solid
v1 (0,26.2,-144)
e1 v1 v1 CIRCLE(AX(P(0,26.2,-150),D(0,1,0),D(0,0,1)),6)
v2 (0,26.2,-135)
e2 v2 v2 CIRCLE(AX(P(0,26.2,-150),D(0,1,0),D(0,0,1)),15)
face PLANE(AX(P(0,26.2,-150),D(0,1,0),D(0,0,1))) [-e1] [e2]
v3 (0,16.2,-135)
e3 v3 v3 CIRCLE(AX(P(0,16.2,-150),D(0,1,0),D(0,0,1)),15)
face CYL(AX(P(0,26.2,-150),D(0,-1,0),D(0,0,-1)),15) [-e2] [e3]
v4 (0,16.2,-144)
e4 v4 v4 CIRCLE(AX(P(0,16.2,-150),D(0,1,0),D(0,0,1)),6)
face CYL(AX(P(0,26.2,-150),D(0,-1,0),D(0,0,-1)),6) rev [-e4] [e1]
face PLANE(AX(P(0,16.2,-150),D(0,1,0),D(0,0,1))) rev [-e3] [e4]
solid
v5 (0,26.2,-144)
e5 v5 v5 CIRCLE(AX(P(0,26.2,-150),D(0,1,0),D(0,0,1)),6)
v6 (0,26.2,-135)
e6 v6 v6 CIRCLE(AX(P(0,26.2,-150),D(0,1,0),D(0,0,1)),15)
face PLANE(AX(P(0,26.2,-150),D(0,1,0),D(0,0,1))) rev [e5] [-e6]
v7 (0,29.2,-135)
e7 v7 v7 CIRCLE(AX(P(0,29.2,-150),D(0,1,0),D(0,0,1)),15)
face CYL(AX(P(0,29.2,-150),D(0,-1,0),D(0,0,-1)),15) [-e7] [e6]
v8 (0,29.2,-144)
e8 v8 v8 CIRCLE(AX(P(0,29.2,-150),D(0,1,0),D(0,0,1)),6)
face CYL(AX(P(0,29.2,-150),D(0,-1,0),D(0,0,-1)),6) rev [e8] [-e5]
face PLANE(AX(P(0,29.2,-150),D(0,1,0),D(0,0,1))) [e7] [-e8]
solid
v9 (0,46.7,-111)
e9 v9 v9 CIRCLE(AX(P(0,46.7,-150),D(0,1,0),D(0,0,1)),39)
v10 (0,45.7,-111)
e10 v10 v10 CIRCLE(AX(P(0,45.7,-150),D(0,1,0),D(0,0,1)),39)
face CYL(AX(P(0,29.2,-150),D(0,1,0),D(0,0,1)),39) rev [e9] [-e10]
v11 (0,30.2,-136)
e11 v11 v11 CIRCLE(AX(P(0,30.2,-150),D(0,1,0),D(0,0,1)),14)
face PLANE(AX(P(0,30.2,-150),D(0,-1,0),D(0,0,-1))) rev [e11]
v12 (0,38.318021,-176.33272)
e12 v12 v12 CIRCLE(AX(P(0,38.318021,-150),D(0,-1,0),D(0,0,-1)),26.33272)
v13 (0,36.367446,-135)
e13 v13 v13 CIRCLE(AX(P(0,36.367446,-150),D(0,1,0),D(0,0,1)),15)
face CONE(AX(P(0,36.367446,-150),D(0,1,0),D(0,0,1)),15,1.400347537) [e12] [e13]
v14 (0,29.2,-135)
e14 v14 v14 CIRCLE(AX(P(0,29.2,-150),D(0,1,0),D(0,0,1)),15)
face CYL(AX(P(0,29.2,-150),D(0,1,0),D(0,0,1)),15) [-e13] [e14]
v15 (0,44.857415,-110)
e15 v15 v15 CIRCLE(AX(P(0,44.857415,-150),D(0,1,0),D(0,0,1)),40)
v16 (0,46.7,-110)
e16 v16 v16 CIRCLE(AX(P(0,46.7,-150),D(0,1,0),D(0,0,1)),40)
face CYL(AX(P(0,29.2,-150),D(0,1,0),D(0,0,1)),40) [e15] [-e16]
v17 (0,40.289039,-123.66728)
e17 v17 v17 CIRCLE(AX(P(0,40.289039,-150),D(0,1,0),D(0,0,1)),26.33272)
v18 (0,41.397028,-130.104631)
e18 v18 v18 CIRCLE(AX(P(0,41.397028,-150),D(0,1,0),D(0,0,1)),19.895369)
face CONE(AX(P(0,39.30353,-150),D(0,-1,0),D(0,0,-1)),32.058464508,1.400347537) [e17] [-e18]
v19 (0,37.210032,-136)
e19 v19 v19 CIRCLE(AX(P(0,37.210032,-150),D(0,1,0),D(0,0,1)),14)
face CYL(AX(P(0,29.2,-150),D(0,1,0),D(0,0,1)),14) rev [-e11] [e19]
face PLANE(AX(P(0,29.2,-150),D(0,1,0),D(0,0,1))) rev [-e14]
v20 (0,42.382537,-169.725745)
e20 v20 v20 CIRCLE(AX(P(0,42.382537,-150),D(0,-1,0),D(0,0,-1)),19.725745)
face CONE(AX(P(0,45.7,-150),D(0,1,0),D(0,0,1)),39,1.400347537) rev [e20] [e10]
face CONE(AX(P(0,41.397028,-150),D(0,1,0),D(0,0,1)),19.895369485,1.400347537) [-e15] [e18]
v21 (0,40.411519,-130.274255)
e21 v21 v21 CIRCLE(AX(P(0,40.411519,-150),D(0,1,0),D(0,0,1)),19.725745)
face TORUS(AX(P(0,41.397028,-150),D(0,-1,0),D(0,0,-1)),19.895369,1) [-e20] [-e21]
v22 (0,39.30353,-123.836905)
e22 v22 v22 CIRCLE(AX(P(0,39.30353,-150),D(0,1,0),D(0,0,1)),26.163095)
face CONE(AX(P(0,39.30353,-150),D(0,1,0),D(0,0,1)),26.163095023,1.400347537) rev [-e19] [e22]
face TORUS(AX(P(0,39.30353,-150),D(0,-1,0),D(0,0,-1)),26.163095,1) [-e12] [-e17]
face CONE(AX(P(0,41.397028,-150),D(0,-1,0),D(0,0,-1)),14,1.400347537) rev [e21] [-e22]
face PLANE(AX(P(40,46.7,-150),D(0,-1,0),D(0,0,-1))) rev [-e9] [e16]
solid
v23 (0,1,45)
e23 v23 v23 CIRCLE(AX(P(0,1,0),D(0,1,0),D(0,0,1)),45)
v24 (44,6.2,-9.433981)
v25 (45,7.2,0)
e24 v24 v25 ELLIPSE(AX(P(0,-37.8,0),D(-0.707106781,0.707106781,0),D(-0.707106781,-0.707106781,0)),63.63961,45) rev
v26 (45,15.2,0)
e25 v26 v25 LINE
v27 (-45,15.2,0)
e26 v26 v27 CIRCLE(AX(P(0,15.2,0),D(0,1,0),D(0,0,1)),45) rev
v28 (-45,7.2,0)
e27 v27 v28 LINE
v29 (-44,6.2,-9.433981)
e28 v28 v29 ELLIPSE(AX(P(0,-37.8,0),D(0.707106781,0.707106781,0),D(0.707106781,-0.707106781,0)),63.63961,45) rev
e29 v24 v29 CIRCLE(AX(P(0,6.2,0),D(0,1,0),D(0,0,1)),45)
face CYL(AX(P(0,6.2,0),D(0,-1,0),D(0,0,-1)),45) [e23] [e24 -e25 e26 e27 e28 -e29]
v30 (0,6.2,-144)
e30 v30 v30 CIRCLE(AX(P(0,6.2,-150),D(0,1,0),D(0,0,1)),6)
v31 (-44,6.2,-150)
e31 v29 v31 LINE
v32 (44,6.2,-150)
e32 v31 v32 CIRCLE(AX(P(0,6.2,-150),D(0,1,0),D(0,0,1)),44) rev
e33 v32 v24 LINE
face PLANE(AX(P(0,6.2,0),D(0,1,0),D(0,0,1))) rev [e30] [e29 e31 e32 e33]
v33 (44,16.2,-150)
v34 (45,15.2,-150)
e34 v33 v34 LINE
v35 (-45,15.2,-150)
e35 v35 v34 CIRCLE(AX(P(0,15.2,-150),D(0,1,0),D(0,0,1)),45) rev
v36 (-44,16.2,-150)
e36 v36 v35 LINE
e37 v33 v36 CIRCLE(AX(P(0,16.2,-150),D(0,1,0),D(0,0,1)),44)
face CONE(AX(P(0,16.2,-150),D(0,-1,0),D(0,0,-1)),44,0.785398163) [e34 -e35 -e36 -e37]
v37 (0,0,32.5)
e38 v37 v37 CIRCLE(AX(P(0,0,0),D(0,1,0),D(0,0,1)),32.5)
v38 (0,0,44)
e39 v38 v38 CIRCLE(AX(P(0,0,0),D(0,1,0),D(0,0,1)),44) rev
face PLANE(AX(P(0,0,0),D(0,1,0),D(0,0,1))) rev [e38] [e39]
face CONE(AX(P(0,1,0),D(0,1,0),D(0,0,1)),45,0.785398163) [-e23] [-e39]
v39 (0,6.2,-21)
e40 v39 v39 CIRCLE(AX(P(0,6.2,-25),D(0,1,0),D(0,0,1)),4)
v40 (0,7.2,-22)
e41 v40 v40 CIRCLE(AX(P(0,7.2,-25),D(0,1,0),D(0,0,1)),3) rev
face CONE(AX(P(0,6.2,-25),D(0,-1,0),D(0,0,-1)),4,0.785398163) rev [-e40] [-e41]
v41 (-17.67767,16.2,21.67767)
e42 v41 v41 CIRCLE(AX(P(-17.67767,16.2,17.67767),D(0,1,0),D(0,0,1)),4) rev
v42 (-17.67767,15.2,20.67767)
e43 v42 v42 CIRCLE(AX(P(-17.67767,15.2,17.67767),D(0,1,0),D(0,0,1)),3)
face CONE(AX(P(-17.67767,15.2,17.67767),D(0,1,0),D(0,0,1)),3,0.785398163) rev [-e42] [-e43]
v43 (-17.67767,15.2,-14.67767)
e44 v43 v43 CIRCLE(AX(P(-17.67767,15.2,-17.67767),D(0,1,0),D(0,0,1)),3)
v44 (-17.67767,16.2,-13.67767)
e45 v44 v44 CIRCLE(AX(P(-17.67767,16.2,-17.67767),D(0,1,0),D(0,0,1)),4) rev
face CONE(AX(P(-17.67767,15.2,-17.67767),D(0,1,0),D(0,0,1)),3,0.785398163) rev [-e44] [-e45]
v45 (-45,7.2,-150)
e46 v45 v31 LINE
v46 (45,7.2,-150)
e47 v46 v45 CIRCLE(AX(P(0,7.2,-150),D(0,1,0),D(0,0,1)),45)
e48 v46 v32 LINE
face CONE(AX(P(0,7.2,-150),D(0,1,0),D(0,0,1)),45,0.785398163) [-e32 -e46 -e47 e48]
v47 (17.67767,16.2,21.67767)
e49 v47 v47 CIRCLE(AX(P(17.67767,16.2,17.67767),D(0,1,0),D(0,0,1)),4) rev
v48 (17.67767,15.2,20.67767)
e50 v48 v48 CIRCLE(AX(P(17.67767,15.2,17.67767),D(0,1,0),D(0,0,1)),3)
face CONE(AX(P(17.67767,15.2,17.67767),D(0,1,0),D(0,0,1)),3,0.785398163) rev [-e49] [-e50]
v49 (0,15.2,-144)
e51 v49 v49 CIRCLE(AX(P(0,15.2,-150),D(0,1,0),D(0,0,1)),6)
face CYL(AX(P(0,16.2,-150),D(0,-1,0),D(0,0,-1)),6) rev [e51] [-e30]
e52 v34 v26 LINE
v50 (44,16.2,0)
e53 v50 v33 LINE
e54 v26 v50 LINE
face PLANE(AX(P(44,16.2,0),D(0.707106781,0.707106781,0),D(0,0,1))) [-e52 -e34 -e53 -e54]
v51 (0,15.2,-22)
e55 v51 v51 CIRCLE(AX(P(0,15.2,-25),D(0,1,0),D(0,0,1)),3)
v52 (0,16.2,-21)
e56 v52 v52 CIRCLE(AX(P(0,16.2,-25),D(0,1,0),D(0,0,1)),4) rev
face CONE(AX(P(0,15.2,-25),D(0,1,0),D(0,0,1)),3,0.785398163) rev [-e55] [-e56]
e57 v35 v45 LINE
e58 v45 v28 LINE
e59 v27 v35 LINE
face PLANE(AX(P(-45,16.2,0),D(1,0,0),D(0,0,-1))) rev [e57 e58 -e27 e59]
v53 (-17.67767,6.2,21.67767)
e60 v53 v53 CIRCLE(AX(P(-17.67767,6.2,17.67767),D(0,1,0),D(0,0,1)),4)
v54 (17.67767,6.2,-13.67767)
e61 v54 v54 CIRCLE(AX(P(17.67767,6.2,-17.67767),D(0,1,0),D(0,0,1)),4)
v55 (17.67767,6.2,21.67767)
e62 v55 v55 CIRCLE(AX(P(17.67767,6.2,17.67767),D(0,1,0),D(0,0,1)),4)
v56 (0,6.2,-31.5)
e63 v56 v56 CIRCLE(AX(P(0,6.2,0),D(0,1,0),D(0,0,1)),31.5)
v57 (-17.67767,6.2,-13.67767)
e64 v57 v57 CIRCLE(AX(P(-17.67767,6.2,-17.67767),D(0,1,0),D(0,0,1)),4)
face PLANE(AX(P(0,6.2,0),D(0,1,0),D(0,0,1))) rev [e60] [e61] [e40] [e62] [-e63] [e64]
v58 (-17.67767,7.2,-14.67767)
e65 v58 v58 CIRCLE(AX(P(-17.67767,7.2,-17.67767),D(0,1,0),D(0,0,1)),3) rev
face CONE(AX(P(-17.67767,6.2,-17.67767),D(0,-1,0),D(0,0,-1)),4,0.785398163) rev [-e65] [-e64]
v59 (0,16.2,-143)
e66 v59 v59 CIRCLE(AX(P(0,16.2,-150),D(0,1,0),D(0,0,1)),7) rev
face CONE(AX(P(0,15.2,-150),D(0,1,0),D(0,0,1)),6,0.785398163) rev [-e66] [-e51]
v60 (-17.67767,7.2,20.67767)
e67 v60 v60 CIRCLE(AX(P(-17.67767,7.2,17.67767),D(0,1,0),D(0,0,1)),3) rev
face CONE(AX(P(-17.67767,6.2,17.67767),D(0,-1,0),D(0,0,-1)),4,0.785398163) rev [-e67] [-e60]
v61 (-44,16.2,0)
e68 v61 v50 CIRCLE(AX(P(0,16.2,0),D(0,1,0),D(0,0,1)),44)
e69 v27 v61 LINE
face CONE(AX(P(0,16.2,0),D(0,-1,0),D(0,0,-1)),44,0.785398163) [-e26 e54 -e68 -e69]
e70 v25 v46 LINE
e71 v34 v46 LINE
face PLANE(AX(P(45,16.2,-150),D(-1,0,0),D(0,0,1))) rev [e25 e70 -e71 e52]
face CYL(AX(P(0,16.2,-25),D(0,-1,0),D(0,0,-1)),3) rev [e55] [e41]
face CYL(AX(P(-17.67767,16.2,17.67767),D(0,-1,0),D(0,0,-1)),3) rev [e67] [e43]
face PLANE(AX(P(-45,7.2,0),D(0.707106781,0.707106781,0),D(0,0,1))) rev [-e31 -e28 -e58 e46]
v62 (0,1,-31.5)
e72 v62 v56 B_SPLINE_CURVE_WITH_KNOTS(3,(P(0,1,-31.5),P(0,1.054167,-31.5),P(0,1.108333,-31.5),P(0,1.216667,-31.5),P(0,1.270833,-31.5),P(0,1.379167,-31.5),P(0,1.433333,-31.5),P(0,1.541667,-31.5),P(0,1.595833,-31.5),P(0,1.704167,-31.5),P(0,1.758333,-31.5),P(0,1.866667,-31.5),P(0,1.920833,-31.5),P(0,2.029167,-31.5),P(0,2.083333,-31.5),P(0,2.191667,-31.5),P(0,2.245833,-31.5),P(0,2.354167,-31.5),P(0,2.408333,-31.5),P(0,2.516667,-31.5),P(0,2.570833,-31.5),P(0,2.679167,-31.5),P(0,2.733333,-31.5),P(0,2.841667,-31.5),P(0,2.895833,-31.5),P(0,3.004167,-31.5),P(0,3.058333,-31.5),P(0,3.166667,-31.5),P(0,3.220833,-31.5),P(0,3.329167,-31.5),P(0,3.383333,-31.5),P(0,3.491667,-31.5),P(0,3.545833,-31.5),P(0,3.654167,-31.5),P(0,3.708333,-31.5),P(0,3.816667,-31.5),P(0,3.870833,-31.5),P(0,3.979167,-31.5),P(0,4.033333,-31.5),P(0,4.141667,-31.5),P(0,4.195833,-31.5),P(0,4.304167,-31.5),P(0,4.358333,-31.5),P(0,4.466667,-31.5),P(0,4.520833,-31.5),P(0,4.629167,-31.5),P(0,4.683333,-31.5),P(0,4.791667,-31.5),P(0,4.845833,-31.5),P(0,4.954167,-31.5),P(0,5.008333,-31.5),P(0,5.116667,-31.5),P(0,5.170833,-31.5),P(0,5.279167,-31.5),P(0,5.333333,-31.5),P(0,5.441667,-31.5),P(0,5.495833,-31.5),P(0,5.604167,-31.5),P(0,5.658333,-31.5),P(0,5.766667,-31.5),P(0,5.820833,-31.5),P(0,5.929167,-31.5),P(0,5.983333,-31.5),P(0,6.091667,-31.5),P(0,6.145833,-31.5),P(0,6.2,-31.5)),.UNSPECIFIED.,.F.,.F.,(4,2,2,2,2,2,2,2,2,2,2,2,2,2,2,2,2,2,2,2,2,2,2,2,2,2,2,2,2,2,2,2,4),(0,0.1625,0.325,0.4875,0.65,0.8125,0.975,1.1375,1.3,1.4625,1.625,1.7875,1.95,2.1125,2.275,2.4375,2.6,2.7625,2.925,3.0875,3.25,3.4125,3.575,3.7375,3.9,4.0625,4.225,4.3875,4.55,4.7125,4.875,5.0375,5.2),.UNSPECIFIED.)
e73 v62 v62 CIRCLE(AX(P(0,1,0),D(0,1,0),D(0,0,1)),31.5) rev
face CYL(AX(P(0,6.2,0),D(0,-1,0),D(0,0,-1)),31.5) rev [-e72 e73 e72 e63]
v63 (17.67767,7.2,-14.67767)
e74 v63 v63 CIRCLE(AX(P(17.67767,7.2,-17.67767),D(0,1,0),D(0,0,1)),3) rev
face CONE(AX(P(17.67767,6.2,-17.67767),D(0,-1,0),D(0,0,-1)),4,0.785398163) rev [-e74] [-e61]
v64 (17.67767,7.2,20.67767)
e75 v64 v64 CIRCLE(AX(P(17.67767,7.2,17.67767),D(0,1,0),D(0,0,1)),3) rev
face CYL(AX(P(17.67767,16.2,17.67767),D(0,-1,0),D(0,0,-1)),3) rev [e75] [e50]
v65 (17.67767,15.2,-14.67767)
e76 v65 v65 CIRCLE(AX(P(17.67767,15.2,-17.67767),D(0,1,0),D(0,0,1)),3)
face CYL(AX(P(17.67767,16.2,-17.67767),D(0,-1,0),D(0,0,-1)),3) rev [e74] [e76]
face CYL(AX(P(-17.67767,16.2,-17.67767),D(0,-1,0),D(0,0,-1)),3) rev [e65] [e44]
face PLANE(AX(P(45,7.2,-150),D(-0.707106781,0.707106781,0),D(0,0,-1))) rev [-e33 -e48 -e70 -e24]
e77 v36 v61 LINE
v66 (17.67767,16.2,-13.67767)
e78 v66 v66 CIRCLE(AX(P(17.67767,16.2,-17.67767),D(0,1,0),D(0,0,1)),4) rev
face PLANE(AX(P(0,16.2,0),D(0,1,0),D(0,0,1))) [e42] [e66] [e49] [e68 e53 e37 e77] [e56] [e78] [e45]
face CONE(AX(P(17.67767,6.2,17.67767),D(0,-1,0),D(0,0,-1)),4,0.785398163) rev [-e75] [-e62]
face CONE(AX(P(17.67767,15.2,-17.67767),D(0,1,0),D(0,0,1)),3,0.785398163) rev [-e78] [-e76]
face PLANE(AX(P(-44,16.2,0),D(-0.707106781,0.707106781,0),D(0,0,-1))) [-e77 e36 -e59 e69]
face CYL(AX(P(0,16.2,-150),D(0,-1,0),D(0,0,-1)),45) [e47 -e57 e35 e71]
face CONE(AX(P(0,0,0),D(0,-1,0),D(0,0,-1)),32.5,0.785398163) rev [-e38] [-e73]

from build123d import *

# Parameters (mm, degrees)
SKIZZE2_R                       = 45
SKIZZE2_R_2                     = 31.5
AUFSATZ_LINEAR_AUSTRAGEN1_DEPTH = 6.2
SKIZZE3_R                       = 3
SKIZZE3_R_2                     = 6
AUFSATZ_LINEAR_AUSTRAGEN2_DEPTH = 10
SKIZZE4_R                       = 15
SKIZZE4_R_2                     = 6
AUFSATZ_LINEAR_AUSTRAGEN3_DEPTH = 10
SKIZZE5_R                       = 15
SKIZZE5_R_2                     = 6
AUFSATZ_LINEAR_AUSTRAGEN4_DEPTH = 3
VERRUNDUNG1_R                   = 1
FASE1_SIZE                      = 1


with BuildPart() as part:
    # Skizze2 → Aufsatz-Linear austragen1 (new body)
    with BuildSketch(Plane(origin=(0, 0, 0), x_dir=(1, 0, 0), z_dir=(0, 1, 0))):
        with Locations(Location((0, 0, 0), (0, 0, 90))):
            Circle(SKIZZE2_R)
        with Locations(Location((0, 0, 0), (0, 0, 90))):
            Circle(SKIZZE2_R_2, mode=Mode.SUBTRACT)
    extrude(amount=AUFSATZ_LINEAR_AUSTRAGEN1_DEPTH)

    # Skizze3 → Aufsatz-Linear austragen2 (add)
    with BuildSketch(Plane(origin=(0, 6.2, 0), x_dir=(1, 0, 0), z_dir=(0, 1, 0))):
        with BuildLine():
            Line((-45, 0), (-45, 150))
            ThreePointArc((-45, 150), (0, 195), (45, 150))
            Line((45, 150), (45, 0))
            ThreePointArc((45, 0), (0, -45), (-45, 0))
        make_face()
        with Locations(Location((0, 25, 0), (0, 0, 270))):
            Circle(SKIZZE3_R, mode=Mode.SUBTRACT)
        with Locations(Location((17.67766953, 17.67766953, 0), (0, 0, 270))):
            Circle(SKIZZE3_R, mode=Mode.SUBTRACT)
        with Locations(Location((17.67766953, -17.67766953, 0), (0, 0, 270))):
            Circle(SKIZZE3_R, mode=Mode.SUBTRACT)
        with Locations(Location((-17.67766953, -17.67766953, 0), (0, 0, 270))):
            Circle(SKIZZE3_R, mode=Mode.SUBTRACT)
        with Locations(Location((-17.67766953, 17.67766953, 0), (0, 0, 270))):
            Circle(SKIZZE3_R, mode=Mode.SUBTRACT)
        with Locations(Location((0, 150, 0), (0, 0, 270))):
            Circle(SKIZZE3_R_2, mode=Mode.SUBTRACT)
    extrude(amount=AUFSATZ_LINEAR_AUSTRAGEN2_DEPTH)

    # Fase1
    # the kernel refuses this chamfer: 1 mm, written as the material it takes off along each edge
    with BuildSketch(Plane(origin=(0, 16.2, 0), x_dir=(1, 0, 0), z_dir=(0, 0, -1))) as fase1_piece_1:
        Polygon((45, FASE1_SIZE), (45 - FASE1_SIZE, 0), (45, 0), align=None)
    revolve(axis=Axis((0, 16.2, 0), (0, -1, 0)), revolution_arc=180, mode=Mode.SUBTRACT)
    with BuildSketch(Plane(origin=(45, 16.2, -150), x_dir=(0.0274958766105891, -0.9996219169112968, 0), z_dir=(0, 0, 1)), Plane(origin=(-45, 16.2, 0), x_dir=(-0.0274958766105891, -0.9996219169112968, 0), z_dir=(0, 0, -1))) as fase1_piece_2:
        Polygon((FASE1_SIZE * 0.999621916911, -FASE1_SIZE * 0.0274958766106), (-FASE1_SIZE * 0.0274958766106, -FASE1_SIZE * 0.999621916911), (0, 0), align=None)
    extrude(amount=150, mode=Mode.SUBTRACT)
    with BuildSketch(Plane(origin=(0, 16.2, -150), x_dir=(-1, 0, 0), z_dir=(0, 0, 1))) as fase1_piece_3:
        Polygon((45, FASE1_SIZE), (45 - FASE1_SIZE, 0), (45, 0), align=None)
    revolve(axis=Axis((0, 16.2, -150), (0, -1, 0)), revolution_arc=180, mode=Mode.SUBTRACT)
    with BuildSketch(Plane(origin=(0, 6.2, -25), x_dir=(0, 0, 1), z_dir=(-1, 0, 0))) as fase1_piece_4:
        Polygon((3 + FASE1_SIZE, 0), (3, FASE1_SIZE), (3, 0), align=None)
    revolve(axis=Axis((0, 6.2, -25), (0, 1, 0)), mode=Mode.SUBTRACT)
    with BuildSketch(Plane(origin=(17.67766953, 6.2, -17.67766953), x_dir=(0, 0, 1), z_dir=(-1, 0, 0))) as fase1_piece_5:
        Polygon((3 + FASE1_SIZE, 0), (3, FASE1_SIZE), (3, 0), align=None)
    revolve(axis=Axis((17.67766953, 6.2, -17.67766953), (0, 1, 0)), mode=Mode.SUBTRACT)
    with BuildSketch(Plane(origin=(17.67766953, 6.2, 17.67766953), x_dir=(0, 0, 1), z_dir=(-1, 0, 0))) as fase1_piece_6:
        Polygon((3 + FASE1_SIZE, 0), (3, FASE1_SIZE), (3, 0), align=None)
    revolve(axis=Axis((17.67766953, 6.2, 17.67766953), (0, 1, 0)), mode=Mode.SUBTRACT)
    with BuildSketch(Plane(origin=(-17.67766953, 6.2, 17.67766953), x_dir=(0, 0, 1), z_dir=(-1, 0, 0))) as fase1_piece_7:
        Polygon((3 + FASE1_SIZE, 0), (3, FASE1_SIZE), (3, 0), align=None)
    revolve(axis=Axis((-17.67766953, 6.2, 17.67766953), (0, 1, 0)), mode=Mode.SUBTRACT)
    with BuildSketch(Plane(origin=(-17.67766953, 6.2, -17.67766953), x_dir=(0, 0, 1), z_dir=(-1, 0, 0))) as fase1_piece_8:
        Polygon((3 + FASE1_SIZE, 0), (3, FASE1_SIZE), (3, 0), align=None)
    revolve(axis=Axis((-17.67766953, 6.2, -17.67766953), (0, 1, 0)), mode=Mode.SUBTRACT)
    with BuildSketch(Plane(origin=(45, 6.2, -150), x_dir=(-0.9996219169112968, -0.027495876610586414, 0), z_dir=(0, 0, 1))) as fase1_piece_9_section:
        Polygon((FASE1_SIZE * 0.999621916911, -FASE1_SIZE * 0.0274958766106), (-FASE1_SIZE * 0.0274958766106, -FASE1_SIZE * 0.999621916911), (0, 0), align=None)
    fase1_piece_9 = extrude(amount=152.571682988, mode=Mode.PRIVATE)
    fase1_piece_9 = fase1_piece_9 - Plane(origin=(0, 6.532274543, 0), x_dir=(0, 0, -1), z_dir=(0, -1, 0)) * Cylinder(45, 310, mode=Mode.PRIVATE)
    add(fase1_piece_9, mode=Mode.SUBTRACT)
    with BuildSketch(Plane(origin=(0, 6.2, -150), x_dir=(-1, 0, 0), z_dir=(0, 0, 1))) as fase1_piece_10:
        Polygon((45 - FASE1_SIZE, 0), (45, -FASE1_SIZE), (45, 0), align=None)
    revolve(axis=Axis((0, 6.2, -150), (0, -1, 0)), revolution_arc=180, mode=Mode.SUBTRACT)
    with BuildSketch(Plane(origin=(-45, 6.2, 2.571682988), x_dir=(0.9996219169112968, -0.027495876610586414, 0), z_dir=(0, 0, -1))) as fase1_piece_11_section:
        Polygon((FASE1_SIZE * 0.999621916911, -FASE1_SIZE * 0.0274958766106), (-FASE1_SIZE * 0.0274958766106, -FASE1_SIZE * 0.999621916911), (0, 0), align=None)
    fase1_piece_11 = extrude(amount=152.571682988, mode=Mode.PRIVATE)
    fase1_piece_11 = fase1_piece_11 - Plane(origin=(0, 6.532274543, 0), x_dir=(0, 0, -1), z_dir=(0, -1, 0)) * Cylinder(45, 310, mode=Mode.PRIVATE)
    add(fase1_piece_11, mode=Mode.SUBTRACT)
    with BuildSketch(Plane(origin=(0, 16.2, -25), x_dir=(0, 0, 1), z_dir=(-1, 0, 0))) as fase1_piece_12:
        Polygon((3 + FASE1_SIZE, 0), (3, -FASE1_SIZE), (3, 0), align=None)
    revolve(axis=Axis((0, 16.2, -25), (0, 1, 0)), mode=Mode.SUBTRACT)
    with BuildSketch(Plane(origin=(17.67766953, 16.2, -17.67766953), x_dir=(0, 0, 1), z_dir=(-1, 0, 0))) as fase1_piece_13:
        Polygon((3 + FASE1_SIZE, 0), (3, -FASE1_SIZE), (3, 0), align=None)
    revolve(axis=Axis((17.67766953, 16.2, -17.67766953), (0, 1, 0)), mode=Mode.SUBTRACT)
    with BuildSketch(Plane(origin=(17.67766953, 16.2, 17.67766953), x_dir=(0, 0, 1), z_dir=(-1, 0, 0))) as fase1_piece_14:
        Polygon((3 + FASE1_SIZE, 0), (3, -FASE1_SIZE), (3, 0), align=None)
    revolve(axis=Axis((17.67766953, 16.2, 17.67766953), (0, 1, 0)), mode=Mode.SUBTRACT)
    with BuildSketch(Plane(origin=(-17.67766953, 16.2, 17.67766953), x_dir=(0, 0, 1), z_dir=(-1, 0, 0))) as fase1_piece_15:
        Polygon((3 + FASE1_SIZE, 0), (3, -FASE1_SIZE), (3, 0), align=None)
    revolve(axis=Axis((-17.67766953, 16.2, 17.67766953), (0, 1, 0)), mode=Mode.SUBTRACT)
    with BuildSketch(Plane(origin=(-17.67766953, 16.2, -17.67766953), x_dir=(0, 0, 1), z_dir=(-1, 0, 0))) as fase1_piece_16:
        Polygon((3 + FASE1_SIZE, 0), (3, -FASE1_SIZE), (3, 0), align=None)
    revolve(axis=Axis((-17.67766953, 16.2, -17.67766953), (0, 1, 0)), mode=Mode.SUBTRACT)
    with BuildSketch(Plane(origin=(0, 16.2, -150), x_dir=(0, 0, 1), z_dir=(-1, 0, 0))) as fase1_piece_17:
        Polygon((6, -FASE1_SIZE), (6 + FASE1_SIZE, 0), (6, 0), align=None)
    revolve(axis=Axis((0, 16.2, -150), (0, 1, 0)), mode=Mode.SUBTRACT)
    with BuildSketch(Plane(origin=(0, 0, 0), x_dir=(0, 0, -1), z_dir=(1, 0, 0))) as fase1_piece_18:
        Polygon((45, FASE1_SIZE), (45 - FASE1_SIZE, 0), (45, 0), align=None)
    revolve(axis=Axis((0, 0, 0), (0, 1, 0)), mode=Mode.SUBTRACT)
    with BuildSketch(Plane(origin=(0, 0, 0), x_dir=(0, 0, -1), z_dir=(1, 0, 0))) as fase1_piece_19:
        Polygon((31.5 + FASE1_SIZE, 0), (31.5, FASE1_SIZE), (31.5, 0), align=None)
    revolve(axis=Axis((0, 0, 0), (0, 1, 0)), mode=Mode.SUBTRACT)


with BuildPart() as body_2:
    # Skizze4 → Aufsatz-Linear austragen3 (new body)
    with BuildSketch(Plane(origin=(0, 16.2, 0), x_dir=(1, 0, 0), z_dir=(0, 1, 0))):
        with Locations(Location((0, 150, 0), (0, 0, 270))):
            Circle(SKIZZE4_R)
        with Locations(Location((0, 150, 0), (0, 0, 270))):
            Circle(SKIZZE4_R_2, mode=Mode.SUBTRACT)
    extrude(amount=AUFSATZ_LINEAR_AUSTRAGEN3_DEPTH)


with BuildPart() as body_3:
    # Skizze5 → Aufsatz-Linear austragen4 (new body)
    with BuildSketch(Plane(origin=(0, 26.2, 0), x_dir=(1, 0, 0), z_dir=(0, 1, 0))):
        with Locations(Location((0, 150, 0), (0, 0, 270))):
            Circle(SKIZZE5_R)
        with Locations(Location((0, 150, 0), (0, 0, 270))):
            Circle(SKIZZE5_R_2, mode=Mode.SUBTRACT)
    extrude(amount=AUFSATZ_LINEAR_AUSTRAGEN4_DEPTH)


with BuildPart() as body_4:
    # Skizze6 → Rotation1 (revolve)
    with BuildSketch(Plane(origin=(0, 0, -150), x_dir=(0, -1, 0), z_dir=(0, 0, 1)), mode=Mode.PRIVATE) as rotation1_sk:
        Polygon((-30.2, 0), (-30.2, 14), (-37.210031823, 14), (-39.303530015, 26.163095023), (-41.397028207, 14), (-45.7, 39), (-46.7, 39), (-46.7, 40), (-44.857414528, 40), (-41.397028207, 19.895369485), (-39.303530015, 32.058464508), (-36.367446351, 15), (-29.2, 15), (-29.2, 0), align=None)
    revolve(rotation1_sk.sketch.rotate(Axis((0, 29.2, -150), (0, -1, 0)), 90), axis=Axis((0, 29.2, -150), (0, -1, 0)))

    # Verrundung1
    verrundung1_edges = [body_4.edges().sort_by_distance(p)[0] for p in [
        (0, 39.303530015, -182.058464508),
        (0, 41.397028207, -164),
    ]]
    fillet(verrundung1_edges, radius=VERRUNDUNG1_R)


solid = Compound([part.part, body_2.part, body_3.part, body_4.part])
